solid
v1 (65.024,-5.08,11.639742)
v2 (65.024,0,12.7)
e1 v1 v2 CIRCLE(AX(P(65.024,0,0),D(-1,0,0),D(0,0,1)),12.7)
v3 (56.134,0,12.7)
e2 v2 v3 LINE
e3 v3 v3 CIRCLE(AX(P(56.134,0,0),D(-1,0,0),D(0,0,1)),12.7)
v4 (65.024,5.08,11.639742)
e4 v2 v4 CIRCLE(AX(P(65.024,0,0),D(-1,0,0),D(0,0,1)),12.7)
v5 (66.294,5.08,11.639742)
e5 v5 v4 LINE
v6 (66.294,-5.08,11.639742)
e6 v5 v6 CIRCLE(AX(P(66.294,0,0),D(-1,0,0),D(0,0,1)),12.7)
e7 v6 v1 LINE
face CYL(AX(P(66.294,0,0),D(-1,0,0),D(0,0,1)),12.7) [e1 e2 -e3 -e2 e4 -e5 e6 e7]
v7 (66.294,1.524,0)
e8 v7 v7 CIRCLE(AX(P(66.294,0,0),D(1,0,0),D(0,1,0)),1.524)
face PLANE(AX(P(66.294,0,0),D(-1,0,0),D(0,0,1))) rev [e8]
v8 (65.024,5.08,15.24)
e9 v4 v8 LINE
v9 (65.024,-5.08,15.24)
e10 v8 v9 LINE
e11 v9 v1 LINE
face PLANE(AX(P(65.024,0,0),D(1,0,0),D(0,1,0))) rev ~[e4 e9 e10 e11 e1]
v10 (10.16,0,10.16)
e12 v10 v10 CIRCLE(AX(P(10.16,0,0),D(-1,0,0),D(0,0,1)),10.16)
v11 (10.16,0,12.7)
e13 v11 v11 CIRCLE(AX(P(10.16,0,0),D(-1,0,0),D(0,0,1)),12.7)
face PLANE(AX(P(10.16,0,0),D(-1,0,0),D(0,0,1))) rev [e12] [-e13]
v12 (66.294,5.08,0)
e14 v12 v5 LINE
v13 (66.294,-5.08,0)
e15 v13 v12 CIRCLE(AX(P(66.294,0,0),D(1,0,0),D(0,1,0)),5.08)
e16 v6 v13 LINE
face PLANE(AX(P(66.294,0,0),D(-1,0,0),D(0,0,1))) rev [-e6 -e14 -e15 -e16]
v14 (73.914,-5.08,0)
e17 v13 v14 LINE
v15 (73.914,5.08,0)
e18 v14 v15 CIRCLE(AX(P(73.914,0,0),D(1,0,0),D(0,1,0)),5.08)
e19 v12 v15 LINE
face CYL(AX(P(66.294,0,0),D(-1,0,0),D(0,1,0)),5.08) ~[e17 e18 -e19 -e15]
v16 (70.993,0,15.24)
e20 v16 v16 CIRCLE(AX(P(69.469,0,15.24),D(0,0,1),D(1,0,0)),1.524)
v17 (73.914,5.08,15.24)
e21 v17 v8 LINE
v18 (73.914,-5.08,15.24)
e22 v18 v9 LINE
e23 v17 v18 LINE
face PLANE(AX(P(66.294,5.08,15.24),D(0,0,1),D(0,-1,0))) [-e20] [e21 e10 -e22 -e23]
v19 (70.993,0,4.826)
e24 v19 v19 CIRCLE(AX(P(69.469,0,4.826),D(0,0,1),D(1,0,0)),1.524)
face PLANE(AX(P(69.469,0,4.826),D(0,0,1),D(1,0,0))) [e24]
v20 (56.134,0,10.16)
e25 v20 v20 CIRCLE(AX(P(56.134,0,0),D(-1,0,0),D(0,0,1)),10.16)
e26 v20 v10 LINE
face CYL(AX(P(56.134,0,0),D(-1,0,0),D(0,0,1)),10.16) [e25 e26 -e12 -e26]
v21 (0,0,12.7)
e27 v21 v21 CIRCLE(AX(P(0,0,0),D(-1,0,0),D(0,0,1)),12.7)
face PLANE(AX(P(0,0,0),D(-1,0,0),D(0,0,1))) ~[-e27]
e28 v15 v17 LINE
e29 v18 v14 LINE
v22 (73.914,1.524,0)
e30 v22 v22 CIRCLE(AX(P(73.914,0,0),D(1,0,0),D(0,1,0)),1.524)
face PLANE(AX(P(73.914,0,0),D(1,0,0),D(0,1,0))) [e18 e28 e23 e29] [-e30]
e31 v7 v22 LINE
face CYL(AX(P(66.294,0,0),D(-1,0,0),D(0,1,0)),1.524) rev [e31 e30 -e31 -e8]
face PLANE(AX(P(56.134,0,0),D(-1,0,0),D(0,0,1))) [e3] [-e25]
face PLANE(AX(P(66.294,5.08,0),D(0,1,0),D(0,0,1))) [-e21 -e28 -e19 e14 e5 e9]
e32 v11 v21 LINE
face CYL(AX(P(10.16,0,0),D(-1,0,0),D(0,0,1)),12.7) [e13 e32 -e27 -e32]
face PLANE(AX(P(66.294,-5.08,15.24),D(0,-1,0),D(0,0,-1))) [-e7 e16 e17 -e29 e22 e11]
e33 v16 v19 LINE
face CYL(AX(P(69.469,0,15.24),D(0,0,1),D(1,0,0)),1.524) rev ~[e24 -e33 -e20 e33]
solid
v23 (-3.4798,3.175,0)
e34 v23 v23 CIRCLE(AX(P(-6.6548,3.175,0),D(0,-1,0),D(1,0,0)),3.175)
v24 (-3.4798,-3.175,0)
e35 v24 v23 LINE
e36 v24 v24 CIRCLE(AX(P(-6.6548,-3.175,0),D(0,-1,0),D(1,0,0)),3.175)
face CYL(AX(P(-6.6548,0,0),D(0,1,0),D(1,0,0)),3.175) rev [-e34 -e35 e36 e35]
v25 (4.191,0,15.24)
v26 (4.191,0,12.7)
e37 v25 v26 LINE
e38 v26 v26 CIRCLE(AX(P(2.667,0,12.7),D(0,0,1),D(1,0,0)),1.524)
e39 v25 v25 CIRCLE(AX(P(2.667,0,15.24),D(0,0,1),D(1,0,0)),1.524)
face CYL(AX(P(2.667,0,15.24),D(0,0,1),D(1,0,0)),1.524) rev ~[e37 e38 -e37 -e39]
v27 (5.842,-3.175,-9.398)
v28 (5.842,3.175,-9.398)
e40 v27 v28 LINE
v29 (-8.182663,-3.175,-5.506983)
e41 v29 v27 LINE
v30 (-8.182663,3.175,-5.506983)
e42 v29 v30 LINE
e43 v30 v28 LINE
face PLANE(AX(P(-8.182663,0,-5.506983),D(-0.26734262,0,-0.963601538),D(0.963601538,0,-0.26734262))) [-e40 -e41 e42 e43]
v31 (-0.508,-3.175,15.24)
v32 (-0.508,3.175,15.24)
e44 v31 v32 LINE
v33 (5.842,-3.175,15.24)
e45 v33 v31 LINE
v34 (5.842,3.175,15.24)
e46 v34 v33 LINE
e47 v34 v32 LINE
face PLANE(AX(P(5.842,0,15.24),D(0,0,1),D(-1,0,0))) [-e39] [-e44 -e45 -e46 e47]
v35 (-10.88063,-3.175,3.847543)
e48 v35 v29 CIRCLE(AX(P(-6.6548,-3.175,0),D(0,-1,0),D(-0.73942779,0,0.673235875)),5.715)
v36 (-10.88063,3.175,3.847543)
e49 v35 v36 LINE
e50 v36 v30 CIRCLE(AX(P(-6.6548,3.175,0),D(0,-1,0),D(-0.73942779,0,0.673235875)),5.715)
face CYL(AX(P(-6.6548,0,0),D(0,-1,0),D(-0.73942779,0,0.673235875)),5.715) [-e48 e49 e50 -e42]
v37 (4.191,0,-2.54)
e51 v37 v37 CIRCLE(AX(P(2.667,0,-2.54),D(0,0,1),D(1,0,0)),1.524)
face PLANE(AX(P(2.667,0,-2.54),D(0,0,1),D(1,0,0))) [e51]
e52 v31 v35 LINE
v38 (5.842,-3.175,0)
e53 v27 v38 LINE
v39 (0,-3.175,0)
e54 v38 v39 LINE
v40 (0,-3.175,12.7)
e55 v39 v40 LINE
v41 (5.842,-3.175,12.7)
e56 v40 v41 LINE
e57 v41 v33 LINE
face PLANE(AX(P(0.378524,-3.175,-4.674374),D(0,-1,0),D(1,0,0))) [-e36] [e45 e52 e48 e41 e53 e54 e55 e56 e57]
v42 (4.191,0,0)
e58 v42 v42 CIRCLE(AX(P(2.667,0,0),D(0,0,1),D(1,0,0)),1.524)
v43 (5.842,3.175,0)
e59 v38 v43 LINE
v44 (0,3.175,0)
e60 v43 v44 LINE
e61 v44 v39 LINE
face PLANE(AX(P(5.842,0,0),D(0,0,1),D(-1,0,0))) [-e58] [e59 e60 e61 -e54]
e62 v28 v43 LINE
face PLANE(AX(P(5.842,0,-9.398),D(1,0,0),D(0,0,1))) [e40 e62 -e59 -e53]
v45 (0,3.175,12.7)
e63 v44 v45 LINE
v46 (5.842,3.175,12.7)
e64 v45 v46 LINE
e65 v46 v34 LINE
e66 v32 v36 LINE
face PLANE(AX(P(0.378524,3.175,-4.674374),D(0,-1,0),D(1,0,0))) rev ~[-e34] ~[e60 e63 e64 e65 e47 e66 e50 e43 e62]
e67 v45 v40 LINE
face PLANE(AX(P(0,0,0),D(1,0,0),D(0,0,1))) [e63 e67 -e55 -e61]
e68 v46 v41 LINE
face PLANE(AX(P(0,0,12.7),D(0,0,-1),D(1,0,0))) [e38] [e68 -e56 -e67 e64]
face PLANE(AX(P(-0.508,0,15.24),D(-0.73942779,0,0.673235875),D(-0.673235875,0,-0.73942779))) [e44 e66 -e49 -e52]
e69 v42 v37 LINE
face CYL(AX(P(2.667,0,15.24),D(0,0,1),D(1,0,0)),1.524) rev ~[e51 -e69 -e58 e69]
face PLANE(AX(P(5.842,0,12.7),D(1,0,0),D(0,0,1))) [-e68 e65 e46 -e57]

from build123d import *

# Parameters (mm, degrees)
F0_W          = 5.842
F0_H          = 12.7
F0_R          = 3.175
F2_DEPTH      = 3.175
F3_R          = 1.524
F4_DEPTH      = 7.62
F4_DEPTH_BACK = 1.27
F5_R          = 1.524
F6_DEPTH      = 10.414
F7_R          = 1.524
F8_DEPTH      = 17.78


with BuildPart() as f1:
    # F0 (on Front) → F1 (revolve)
    with BuildSketch(Plane.XZ):
        Polygon((5.842, 12.7), (5.842, 0), (66.294, 0), (66.294, 12.7), (56.134, 12.7), (56.134, 10.16), (10.16, 10.16), (10.16, 12.7), align=None)
        with Locations((2.921, 6.35)):
            Rectangle(F0_W, F0_H)
    revolve(axis=Axis((33.147, 0, 0), (-1, 0, 0)))

    # F3 (on face) → F4 (join, two sides)
    with BuildSketch(Plane.YZ.offset(66.294)) as f4_sk:
        with BuildLine():
            ThreePointArc((-5.08, 0), (0, -5.08), (5.08, 0))
            ThreePointArc((5.08, 0), (0, 5.08), (-5.08, 0))
        make_face()
        Circle(F3_R, mode=Mode.SUBTRACT)
        with BuildLine():
            ThreePointArc((-5.08, 11.6397422652), (0, 12.7), (5.08, 11.6397422652))
            Line((5.08, 11.6397422652), (5.08, 15.24))
            Line((5.08, 15.24), (-5.08, 15.24))
            Line((-5.08, 15.24), (-5.08, 11.6397422652))
        make_face()
        with BuildLine():
            ThreePointArc((-5.08, 0), (0, 5.08), (5.08, 0))
            Line((5.08, 0), (5.08, 11.6397422652))
            ThreePointArc((5.08, 11.6397422652), (0, 12.7), (-5.08, 11.6397422652))
            Line((-5.08, 11.6397422652), (-5.08, 0))
        make_face()
    extrude(amount=F4_DEPTH)
    extrude(f4_sk.sketch, amount=-F4_DEPTH_BACK)

    # F5 (on face) → F6 (cut)
    with BuildSketch(Plane.XY.offset(15.24)):
        with Locations((69.469, 0)):
            Circle(F5_R)
    extrude(amount=-F6_DEPTH, mode=Mode.SUBTRACT)


with BuildPart() as f2:
    # F0 (on Front) → F2 (new body, symmetric)
    with BuildSketch(Plane.XZ):
        with BuildLine():
            Line((5.842, 0), (0, 0))
            Line((0, 0), (-0.9398, 0))
            ThreePointArc((-0.9398, 0), (-3.1957909266, -4.5493385486), (-8.1826630726, -5.5069827884))
            Line((-8.1826630726, -5.5069827884), (5.842, -9.398))
            Line((5.842, -9.398), (5.842, 0))
        make_face()
        with BuildLine():
            Line((-0.9398, 0), (0, 0))
            Line((0, 0), (0, 12.7))
            Line((0, 12.7), (5.842, 12.7))
            Line((5.842, 12.7), (5.842, 15.24))
            Line((5.842, 15.24), (-0.508, 15.24))
            Line((-0.508, 15.24), (-10.8806298187, 3.8475430269))
            ThreePointArc((-10.8806298187, 3.8475430269), (-4.5919612295, 5.3297205562), (-0.9398, 0))
        make_face()
        with BuildLine():
            ThreePointArc((-8.1826630726, -5.5069827884), (-3.1957909266, -4.5493385486), (-0.9398, 0))
            ThreePointArc((-0.9398, 0), (-4.5919612295, 5.3297205562), (-10.8806298187, 3.8475430269))
            ThreePointArc((-10.8806298187, 3.8475430269), (-12.1459778134, -1.5837270034), (-8.1826630726, -5.5069827884))
        make_face()
        with Locations((-6.6548, 0)):
            Circle(F0_R, mode=Mode.SUBTRACT)
    extrude(amount=F2_DEPTH, both=True)

    # F7 (on face) → F8 (cut)
    with BuildSketch(Plane.XY.offset(15.24)):
        with Locations((2.667, 0)):
            Circle(F7_R)
    extrude(amount=-F8_DEPTH, mode=Mode.SUBTRACT)


solid = Compound([f1.part, f2.part])
